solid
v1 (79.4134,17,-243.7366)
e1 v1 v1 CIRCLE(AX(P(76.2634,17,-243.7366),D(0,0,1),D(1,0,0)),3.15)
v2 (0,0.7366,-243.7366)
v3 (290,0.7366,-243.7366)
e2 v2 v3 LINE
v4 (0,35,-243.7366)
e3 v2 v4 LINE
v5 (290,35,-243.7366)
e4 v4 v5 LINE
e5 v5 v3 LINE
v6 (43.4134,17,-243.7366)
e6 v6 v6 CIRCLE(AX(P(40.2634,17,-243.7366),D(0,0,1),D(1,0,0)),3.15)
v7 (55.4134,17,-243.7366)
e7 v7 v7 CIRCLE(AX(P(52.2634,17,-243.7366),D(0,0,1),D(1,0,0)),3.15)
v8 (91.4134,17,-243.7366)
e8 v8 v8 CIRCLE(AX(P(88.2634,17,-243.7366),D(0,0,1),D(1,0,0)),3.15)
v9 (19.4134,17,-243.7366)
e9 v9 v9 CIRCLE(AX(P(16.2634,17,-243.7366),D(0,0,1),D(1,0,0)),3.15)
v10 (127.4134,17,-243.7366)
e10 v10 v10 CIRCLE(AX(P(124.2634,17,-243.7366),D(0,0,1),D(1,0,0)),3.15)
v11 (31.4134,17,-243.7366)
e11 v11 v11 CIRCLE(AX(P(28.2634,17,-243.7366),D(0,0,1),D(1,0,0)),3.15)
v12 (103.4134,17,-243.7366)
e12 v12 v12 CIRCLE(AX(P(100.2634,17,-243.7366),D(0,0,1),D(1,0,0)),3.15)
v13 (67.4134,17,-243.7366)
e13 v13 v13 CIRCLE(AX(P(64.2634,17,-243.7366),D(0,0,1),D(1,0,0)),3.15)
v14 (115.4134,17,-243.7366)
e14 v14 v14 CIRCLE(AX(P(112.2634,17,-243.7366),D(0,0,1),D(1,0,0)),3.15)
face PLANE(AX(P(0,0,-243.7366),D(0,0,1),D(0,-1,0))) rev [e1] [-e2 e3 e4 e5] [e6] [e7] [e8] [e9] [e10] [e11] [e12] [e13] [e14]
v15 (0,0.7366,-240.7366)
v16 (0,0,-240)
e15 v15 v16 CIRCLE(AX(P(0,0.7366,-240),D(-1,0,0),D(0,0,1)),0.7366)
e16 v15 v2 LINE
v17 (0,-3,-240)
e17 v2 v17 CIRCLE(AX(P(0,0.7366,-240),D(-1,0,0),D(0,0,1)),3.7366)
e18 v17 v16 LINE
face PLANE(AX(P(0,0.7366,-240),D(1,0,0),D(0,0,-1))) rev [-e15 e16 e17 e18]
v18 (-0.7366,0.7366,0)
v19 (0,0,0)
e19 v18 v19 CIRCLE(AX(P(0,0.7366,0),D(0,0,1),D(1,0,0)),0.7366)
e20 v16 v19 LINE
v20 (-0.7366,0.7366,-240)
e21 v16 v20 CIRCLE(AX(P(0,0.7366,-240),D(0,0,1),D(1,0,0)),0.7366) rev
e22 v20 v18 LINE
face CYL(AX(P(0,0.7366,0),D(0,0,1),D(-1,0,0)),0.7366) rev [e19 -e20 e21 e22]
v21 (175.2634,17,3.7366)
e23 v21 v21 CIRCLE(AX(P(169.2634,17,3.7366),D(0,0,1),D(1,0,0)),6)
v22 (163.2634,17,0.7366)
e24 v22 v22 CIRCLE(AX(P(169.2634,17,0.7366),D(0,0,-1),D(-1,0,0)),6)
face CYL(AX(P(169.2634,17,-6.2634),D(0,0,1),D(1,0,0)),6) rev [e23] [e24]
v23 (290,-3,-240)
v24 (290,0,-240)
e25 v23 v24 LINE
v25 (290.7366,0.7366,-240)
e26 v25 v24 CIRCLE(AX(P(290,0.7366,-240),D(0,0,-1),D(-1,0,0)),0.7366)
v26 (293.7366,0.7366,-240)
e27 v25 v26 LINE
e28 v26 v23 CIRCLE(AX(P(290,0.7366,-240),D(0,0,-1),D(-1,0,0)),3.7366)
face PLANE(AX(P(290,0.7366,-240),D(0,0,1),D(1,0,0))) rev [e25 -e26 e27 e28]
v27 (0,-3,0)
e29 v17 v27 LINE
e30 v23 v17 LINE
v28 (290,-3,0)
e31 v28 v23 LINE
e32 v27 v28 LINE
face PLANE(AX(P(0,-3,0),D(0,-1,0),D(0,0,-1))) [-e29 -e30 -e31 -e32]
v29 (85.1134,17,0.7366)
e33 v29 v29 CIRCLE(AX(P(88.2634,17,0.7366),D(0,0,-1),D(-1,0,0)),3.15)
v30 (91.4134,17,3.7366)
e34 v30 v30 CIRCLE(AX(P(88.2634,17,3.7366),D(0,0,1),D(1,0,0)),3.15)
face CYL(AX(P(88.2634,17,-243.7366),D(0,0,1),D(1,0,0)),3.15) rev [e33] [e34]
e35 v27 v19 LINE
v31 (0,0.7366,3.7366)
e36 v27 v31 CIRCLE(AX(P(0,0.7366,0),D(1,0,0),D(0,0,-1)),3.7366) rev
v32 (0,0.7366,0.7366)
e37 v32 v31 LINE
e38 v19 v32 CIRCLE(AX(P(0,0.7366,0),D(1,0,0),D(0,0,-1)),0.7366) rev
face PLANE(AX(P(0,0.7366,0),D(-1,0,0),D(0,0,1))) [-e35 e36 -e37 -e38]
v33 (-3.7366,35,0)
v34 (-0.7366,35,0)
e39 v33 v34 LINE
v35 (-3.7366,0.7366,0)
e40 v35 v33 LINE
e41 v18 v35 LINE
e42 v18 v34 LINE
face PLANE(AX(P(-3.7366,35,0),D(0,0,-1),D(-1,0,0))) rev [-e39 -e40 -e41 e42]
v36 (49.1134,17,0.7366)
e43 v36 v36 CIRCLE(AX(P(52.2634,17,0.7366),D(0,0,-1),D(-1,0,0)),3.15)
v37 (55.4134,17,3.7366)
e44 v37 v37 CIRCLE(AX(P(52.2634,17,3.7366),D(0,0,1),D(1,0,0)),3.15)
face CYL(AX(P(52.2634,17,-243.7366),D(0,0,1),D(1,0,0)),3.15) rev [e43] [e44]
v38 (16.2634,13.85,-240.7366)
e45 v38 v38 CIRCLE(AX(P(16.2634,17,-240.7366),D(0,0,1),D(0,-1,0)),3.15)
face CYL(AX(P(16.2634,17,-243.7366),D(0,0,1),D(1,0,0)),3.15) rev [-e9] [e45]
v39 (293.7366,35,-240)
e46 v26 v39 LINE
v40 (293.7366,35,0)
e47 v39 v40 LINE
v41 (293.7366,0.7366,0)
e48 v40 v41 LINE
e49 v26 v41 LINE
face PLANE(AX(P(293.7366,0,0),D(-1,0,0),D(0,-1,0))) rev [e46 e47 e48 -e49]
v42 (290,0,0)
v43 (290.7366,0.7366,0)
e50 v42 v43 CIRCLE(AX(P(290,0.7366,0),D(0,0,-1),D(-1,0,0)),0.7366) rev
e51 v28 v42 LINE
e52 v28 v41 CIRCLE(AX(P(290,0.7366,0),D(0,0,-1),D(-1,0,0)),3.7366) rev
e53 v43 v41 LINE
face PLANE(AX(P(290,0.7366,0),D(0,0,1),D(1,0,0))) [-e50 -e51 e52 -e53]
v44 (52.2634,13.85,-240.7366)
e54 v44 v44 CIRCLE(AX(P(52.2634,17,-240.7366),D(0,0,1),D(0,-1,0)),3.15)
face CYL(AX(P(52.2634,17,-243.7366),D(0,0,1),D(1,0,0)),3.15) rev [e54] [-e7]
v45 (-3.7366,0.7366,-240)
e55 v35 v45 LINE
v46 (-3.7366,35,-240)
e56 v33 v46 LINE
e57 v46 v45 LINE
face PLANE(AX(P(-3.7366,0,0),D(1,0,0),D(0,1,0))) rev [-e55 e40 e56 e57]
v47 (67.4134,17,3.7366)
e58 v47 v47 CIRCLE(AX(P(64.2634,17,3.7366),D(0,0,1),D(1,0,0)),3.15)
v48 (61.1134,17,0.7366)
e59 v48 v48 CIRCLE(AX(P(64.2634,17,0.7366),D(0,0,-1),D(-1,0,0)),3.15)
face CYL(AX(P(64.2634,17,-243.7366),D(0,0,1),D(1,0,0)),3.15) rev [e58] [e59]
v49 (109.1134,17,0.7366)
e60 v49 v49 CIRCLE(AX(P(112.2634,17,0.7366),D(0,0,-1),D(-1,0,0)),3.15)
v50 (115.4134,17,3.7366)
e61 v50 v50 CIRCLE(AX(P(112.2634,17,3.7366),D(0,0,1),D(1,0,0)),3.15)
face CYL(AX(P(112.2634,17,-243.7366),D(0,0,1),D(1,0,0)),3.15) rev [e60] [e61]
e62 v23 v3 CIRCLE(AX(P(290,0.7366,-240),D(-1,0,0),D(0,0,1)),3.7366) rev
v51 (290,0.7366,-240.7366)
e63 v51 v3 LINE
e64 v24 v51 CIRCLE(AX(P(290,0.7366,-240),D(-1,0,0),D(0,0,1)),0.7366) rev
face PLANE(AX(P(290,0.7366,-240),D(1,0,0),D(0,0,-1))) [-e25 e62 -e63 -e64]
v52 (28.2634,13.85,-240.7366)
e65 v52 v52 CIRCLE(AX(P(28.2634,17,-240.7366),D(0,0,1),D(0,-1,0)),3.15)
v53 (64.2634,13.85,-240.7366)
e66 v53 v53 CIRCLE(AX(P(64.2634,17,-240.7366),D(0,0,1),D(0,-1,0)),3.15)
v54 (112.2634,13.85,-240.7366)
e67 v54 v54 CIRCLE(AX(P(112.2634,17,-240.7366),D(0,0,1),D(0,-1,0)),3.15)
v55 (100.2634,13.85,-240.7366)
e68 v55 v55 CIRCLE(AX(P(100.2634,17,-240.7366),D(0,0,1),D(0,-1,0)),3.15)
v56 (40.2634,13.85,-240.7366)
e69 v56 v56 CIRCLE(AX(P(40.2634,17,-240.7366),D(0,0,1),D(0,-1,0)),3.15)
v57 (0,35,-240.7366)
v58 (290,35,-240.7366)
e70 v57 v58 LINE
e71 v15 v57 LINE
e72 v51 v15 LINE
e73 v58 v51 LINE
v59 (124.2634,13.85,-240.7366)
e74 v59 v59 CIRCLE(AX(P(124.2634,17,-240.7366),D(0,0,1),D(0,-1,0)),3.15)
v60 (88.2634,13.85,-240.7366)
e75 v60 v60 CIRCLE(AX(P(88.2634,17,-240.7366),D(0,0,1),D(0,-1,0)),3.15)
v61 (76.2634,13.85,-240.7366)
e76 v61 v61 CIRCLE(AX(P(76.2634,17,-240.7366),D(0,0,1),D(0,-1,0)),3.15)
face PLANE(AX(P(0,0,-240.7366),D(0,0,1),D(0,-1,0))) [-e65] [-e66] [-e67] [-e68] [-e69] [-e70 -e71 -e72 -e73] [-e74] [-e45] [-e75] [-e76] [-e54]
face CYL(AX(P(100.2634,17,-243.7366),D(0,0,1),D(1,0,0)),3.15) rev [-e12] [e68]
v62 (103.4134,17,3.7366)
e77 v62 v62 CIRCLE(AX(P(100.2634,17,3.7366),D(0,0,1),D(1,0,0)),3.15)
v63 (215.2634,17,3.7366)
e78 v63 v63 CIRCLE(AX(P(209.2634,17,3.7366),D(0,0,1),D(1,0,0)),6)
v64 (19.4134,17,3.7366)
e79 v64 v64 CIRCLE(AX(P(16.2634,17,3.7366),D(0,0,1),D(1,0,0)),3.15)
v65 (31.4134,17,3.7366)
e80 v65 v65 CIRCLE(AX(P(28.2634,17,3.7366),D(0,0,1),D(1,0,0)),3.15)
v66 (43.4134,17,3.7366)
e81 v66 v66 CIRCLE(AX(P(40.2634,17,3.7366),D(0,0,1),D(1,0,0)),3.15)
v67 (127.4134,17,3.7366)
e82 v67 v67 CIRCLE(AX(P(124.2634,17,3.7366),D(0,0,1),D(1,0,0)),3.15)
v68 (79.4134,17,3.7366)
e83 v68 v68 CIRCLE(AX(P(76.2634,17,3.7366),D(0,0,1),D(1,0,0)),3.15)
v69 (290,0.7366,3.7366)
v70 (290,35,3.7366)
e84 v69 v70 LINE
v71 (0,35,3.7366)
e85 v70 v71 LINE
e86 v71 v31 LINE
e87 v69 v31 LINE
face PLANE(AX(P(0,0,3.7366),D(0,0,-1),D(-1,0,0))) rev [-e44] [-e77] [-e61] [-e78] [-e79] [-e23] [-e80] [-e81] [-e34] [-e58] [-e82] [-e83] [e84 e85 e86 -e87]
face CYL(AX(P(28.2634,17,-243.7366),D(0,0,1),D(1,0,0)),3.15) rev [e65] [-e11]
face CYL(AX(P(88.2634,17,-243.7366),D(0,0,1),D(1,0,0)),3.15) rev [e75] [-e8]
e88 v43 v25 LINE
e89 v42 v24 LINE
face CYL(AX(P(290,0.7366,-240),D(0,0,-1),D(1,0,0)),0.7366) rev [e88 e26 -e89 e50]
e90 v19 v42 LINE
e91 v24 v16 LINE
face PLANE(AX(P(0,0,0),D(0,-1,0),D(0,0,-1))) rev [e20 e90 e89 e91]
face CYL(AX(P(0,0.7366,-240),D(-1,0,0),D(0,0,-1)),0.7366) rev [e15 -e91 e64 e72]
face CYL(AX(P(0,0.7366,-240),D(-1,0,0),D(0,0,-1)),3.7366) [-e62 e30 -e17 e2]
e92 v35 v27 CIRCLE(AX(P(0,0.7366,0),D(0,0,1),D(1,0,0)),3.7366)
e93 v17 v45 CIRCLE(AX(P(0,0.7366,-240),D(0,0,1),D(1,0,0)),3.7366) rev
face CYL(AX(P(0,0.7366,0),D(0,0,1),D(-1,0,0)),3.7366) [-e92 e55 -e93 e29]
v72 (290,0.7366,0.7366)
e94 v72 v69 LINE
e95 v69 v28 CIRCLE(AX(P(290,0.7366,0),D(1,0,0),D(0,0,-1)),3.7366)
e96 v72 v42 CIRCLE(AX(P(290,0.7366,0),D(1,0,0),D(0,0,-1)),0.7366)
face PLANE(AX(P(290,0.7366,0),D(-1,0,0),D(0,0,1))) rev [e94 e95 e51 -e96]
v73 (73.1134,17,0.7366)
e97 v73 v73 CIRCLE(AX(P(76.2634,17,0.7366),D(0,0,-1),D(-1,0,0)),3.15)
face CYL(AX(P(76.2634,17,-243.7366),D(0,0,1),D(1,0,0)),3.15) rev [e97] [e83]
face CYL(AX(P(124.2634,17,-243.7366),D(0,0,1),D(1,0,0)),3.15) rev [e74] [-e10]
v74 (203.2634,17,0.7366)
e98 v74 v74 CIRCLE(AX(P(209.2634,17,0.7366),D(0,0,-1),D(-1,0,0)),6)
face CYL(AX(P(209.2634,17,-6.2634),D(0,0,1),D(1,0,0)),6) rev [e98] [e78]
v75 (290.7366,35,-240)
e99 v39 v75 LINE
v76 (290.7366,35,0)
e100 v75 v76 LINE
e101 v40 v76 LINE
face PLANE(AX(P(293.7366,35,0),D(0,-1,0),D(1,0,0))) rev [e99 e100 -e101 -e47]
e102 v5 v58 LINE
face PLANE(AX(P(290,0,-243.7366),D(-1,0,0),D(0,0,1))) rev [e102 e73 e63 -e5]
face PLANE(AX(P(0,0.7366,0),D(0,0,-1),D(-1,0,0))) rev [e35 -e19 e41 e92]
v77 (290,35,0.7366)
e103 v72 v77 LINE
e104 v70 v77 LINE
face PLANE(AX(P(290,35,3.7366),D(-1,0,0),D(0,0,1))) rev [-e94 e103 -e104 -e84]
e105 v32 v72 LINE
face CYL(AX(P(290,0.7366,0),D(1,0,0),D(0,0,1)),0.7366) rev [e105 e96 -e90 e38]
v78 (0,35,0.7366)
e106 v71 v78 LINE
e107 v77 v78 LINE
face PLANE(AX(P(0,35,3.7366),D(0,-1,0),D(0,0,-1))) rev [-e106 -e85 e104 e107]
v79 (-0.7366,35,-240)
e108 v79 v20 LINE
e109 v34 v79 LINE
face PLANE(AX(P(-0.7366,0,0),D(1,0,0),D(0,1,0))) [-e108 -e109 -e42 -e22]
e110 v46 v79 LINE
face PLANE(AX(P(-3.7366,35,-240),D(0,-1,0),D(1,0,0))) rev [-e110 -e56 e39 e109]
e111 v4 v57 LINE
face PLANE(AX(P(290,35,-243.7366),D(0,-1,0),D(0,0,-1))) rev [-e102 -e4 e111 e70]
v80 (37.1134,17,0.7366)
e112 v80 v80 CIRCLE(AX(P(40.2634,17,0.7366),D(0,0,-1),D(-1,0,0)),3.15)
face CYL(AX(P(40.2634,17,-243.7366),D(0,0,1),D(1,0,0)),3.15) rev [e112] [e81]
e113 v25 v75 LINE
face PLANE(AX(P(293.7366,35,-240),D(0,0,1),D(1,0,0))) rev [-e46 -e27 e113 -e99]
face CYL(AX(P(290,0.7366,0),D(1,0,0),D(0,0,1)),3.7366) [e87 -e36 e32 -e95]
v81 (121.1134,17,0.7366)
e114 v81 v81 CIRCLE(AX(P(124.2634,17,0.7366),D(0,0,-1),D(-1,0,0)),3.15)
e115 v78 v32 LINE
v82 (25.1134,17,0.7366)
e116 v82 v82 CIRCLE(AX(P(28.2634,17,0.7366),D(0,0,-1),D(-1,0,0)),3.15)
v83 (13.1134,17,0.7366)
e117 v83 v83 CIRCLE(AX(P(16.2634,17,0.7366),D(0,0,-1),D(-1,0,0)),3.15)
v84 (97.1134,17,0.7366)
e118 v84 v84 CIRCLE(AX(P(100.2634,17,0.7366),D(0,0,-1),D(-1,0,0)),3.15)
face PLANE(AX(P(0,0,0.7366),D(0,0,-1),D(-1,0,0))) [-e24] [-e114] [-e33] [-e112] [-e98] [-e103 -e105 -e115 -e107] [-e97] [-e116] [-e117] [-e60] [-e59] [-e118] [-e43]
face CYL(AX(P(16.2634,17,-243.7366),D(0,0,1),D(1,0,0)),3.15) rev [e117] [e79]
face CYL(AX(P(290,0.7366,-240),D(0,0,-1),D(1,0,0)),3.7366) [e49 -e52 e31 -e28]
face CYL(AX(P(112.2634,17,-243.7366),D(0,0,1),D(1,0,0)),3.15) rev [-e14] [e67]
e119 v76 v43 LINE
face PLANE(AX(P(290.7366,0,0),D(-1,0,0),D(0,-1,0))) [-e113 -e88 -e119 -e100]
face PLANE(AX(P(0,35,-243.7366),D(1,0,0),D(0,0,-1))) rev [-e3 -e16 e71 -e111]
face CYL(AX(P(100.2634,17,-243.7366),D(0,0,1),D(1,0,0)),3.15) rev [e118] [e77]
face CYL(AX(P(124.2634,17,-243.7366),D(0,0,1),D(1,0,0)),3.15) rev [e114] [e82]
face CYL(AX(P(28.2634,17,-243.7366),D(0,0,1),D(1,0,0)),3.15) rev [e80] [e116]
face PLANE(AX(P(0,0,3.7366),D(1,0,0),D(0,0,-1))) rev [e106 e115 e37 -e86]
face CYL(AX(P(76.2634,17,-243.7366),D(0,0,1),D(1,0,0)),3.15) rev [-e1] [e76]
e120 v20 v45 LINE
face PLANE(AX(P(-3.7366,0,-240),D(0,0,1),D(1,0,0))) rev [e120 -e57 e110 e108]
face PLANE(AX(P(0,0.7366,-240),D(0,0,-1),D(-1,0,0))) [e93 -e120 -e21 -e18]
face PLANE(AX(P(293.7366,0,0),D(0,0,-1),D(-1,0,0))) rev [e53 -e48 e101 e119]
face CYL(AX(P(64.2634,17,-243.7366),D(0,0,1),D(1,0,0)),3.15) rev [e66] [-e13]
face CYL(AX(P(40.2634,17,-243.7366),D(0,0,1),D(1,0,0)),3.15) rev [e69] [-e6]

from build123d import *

# Parameters (mm, degrees)
SKETCH15_W         = 290
SKETCH15_H         = 240
BASE_FLANGE1_DEPTH = 3
EDGE_FLANGE1_DEPTH = 240
EDGE_FLANGE2_DEPTH = 290
EDGE_FLANGE3_DEPTH = 240
EDGE_FLANGE4_DEPTH = 290
SKETCH32_R         = 3.15
CUT_EXTRUDE3_DEPTH = 386.680145843
SKETCH33_R         = 6
CUT_EXTRUDE4_DEPTH = 10


# Sheet-metal steps are written as plain solids
with BuildPart() as part:
    # Sketch15 → Base-Flange1 (new body)
    with BuildSketch(Plane(origin=(0, 0, 0), x_dir=(1, 0, 0), z_dir=(0, 1, 0))):
        with Locations((145, 120)):
            Rectangle(SKETCH15_W, SKETCH15_H)
    extrude(amount=-BASE_FLANGE1_DEPTH)

    # Edge-Flange1 section (across the edge) → Edge-Flange1 (add)
    with BuildSketch(Plane(origin=(-0.7366, 0, -240), x_dir=(1, 0, 0), z_dir=(0, 0, 1))):
        with BuildLine():
            Line((-3, 0.7366), (-3, 35))
            Line((-3, 35), (0, 35))
            Line((0, 35), (0, 0.7366))
            ThreePointArc((0, 0.7366), (0.215745145, 0.215745145), (0.7366, 0))
            Line((0.7366, 0), (0.7366, -3))
            ThreePointArc((0.7366, -3), (-1.905575199, -1.905575199), (-3, 0.7366))
        make_face()
    extrude(amount=EDGE_FLANGE1_DEPTH)

    # Edge-Flange2 section (across the edge) → Edge-Flange2 (add)
    with BuildSketch(Plane(origin=(0, 0, 0.7366), x_dir=(0, 0, -1), z_dir=(1, 0, 0))):
        with BuildLine():
            Line((-3, 0.7366), (-3, 35))
            Line((-3, 35), (0, 35))
            Line((0, 35), (0, 0.7366))
            ThreePointArc((0, 0.7366), (0.215745145, 0.215745145), (0.7366, 0))
            Line((0.7366, 0), (0.7366, -3))
            ThreePointArc((0.7366, -3), (-1.905575199, -1.905575199), (-3, 0.7366))
        make_face()
    extrude(amount=EDGE_FLANGE2_DEPTH)

    # Edge-Flange3 section (across the edge) → Edge-Flange3 (add)
    with BuildSketch(Plane(origin=(290.7366, 0, 0), x_dir=(-1, 0, 0), z_dir=(0, 0, -1))):
        with BuildLine():
            Line((-3, 0.7366), (-3, 35))
            Line((-3, 35), (0, 35))
            Line((0, 35), (0, 0.7366))
            ThreePointArc((0, 0.7366), (0.215745145, 0.215745145), (0.7366, 0))
            Line((0.7366, 0), (0.7366, -3))
            ThreePointArc((0.7366, -3), (-1.905575199, -1.905575199), (-3, 0.7366))
        make_face()
    extrude(amount=EDGE_FLANGE3_DEPTH)

    # Edge-Flange4 section (across the edge) → Edge-Flange4 (add)
    with BuildSketch(Plane(origin=(290, 0, -240.7366), x_dir=(0, 0, 1), z_dir=(-1, 0, 0))):
        with BuildLine():
            Line((-3, 0.7366), (-3, 35))
            Line((-3, 35), (0, 35))
            Line((0, 35), (0, 0.7366))
            ThreePointArc((0, 0.7366), (0.215745145, 0.215745145), (0.7366, 0))
            Line((0.7366, 0), (0.7366, -3))
            ThreePointArc((0.7366, -3), (-1.905575199, -1.905575199), (-3, 0.7366))
        make_face()
    extrude(amount=EDGE_FLANGE4_DEPTH)

    # Sketch32 → Cut-Extrude3 (cut, through all)
    with BuildSketch(Plane.XY.offset(3.7366)):
        with Locations((16.2634, 17)):
            Circle(SKETCH32_R)
        with Locations((28.2634, 17)):
            Circle(SKETCH32_R)
        with Locations((40.2634, 17)):
            Circle(SKETCH32_R)
        with Locations((52.2634, 17)):
            Circle(SKETCH32_R)
        with Locations((64.2634, 17)):
            Circle(SKETCH32_R)
        with Locations((76.2634, 17)):
            Circle(SKETCH32_R)
        with Locations((88.2634, 17)):
            Circle(SKETCH32_R)
        with Locations((100.2634, 17)):
            Circle(SKETCH32_R)
        with Locations((112.2634, 17)):
            Circle(SKETCH32_R)
        with Locations((124.2634, 17)):
            Circle(SKETCH32_R)
    extrude(amount=-CUT_EXTRUDE3_DEPTH, mode=Mode.SUBTRACT)

    # Sketch33 → Cut-Extrude4 (cut)
    with BuildSketch(Plane.XY.offset(3.7366)):
        with Locations((169.2634, 17)):
            Circle(SKETCH33_R)
        with Locations((209.2634, 17)):
            Circle(SKETCH33_R)
    extrude(amount=-CUT_EXTRUDE4_DEPTH, mode=Mode.SUBTRACT)


solid = part.part
